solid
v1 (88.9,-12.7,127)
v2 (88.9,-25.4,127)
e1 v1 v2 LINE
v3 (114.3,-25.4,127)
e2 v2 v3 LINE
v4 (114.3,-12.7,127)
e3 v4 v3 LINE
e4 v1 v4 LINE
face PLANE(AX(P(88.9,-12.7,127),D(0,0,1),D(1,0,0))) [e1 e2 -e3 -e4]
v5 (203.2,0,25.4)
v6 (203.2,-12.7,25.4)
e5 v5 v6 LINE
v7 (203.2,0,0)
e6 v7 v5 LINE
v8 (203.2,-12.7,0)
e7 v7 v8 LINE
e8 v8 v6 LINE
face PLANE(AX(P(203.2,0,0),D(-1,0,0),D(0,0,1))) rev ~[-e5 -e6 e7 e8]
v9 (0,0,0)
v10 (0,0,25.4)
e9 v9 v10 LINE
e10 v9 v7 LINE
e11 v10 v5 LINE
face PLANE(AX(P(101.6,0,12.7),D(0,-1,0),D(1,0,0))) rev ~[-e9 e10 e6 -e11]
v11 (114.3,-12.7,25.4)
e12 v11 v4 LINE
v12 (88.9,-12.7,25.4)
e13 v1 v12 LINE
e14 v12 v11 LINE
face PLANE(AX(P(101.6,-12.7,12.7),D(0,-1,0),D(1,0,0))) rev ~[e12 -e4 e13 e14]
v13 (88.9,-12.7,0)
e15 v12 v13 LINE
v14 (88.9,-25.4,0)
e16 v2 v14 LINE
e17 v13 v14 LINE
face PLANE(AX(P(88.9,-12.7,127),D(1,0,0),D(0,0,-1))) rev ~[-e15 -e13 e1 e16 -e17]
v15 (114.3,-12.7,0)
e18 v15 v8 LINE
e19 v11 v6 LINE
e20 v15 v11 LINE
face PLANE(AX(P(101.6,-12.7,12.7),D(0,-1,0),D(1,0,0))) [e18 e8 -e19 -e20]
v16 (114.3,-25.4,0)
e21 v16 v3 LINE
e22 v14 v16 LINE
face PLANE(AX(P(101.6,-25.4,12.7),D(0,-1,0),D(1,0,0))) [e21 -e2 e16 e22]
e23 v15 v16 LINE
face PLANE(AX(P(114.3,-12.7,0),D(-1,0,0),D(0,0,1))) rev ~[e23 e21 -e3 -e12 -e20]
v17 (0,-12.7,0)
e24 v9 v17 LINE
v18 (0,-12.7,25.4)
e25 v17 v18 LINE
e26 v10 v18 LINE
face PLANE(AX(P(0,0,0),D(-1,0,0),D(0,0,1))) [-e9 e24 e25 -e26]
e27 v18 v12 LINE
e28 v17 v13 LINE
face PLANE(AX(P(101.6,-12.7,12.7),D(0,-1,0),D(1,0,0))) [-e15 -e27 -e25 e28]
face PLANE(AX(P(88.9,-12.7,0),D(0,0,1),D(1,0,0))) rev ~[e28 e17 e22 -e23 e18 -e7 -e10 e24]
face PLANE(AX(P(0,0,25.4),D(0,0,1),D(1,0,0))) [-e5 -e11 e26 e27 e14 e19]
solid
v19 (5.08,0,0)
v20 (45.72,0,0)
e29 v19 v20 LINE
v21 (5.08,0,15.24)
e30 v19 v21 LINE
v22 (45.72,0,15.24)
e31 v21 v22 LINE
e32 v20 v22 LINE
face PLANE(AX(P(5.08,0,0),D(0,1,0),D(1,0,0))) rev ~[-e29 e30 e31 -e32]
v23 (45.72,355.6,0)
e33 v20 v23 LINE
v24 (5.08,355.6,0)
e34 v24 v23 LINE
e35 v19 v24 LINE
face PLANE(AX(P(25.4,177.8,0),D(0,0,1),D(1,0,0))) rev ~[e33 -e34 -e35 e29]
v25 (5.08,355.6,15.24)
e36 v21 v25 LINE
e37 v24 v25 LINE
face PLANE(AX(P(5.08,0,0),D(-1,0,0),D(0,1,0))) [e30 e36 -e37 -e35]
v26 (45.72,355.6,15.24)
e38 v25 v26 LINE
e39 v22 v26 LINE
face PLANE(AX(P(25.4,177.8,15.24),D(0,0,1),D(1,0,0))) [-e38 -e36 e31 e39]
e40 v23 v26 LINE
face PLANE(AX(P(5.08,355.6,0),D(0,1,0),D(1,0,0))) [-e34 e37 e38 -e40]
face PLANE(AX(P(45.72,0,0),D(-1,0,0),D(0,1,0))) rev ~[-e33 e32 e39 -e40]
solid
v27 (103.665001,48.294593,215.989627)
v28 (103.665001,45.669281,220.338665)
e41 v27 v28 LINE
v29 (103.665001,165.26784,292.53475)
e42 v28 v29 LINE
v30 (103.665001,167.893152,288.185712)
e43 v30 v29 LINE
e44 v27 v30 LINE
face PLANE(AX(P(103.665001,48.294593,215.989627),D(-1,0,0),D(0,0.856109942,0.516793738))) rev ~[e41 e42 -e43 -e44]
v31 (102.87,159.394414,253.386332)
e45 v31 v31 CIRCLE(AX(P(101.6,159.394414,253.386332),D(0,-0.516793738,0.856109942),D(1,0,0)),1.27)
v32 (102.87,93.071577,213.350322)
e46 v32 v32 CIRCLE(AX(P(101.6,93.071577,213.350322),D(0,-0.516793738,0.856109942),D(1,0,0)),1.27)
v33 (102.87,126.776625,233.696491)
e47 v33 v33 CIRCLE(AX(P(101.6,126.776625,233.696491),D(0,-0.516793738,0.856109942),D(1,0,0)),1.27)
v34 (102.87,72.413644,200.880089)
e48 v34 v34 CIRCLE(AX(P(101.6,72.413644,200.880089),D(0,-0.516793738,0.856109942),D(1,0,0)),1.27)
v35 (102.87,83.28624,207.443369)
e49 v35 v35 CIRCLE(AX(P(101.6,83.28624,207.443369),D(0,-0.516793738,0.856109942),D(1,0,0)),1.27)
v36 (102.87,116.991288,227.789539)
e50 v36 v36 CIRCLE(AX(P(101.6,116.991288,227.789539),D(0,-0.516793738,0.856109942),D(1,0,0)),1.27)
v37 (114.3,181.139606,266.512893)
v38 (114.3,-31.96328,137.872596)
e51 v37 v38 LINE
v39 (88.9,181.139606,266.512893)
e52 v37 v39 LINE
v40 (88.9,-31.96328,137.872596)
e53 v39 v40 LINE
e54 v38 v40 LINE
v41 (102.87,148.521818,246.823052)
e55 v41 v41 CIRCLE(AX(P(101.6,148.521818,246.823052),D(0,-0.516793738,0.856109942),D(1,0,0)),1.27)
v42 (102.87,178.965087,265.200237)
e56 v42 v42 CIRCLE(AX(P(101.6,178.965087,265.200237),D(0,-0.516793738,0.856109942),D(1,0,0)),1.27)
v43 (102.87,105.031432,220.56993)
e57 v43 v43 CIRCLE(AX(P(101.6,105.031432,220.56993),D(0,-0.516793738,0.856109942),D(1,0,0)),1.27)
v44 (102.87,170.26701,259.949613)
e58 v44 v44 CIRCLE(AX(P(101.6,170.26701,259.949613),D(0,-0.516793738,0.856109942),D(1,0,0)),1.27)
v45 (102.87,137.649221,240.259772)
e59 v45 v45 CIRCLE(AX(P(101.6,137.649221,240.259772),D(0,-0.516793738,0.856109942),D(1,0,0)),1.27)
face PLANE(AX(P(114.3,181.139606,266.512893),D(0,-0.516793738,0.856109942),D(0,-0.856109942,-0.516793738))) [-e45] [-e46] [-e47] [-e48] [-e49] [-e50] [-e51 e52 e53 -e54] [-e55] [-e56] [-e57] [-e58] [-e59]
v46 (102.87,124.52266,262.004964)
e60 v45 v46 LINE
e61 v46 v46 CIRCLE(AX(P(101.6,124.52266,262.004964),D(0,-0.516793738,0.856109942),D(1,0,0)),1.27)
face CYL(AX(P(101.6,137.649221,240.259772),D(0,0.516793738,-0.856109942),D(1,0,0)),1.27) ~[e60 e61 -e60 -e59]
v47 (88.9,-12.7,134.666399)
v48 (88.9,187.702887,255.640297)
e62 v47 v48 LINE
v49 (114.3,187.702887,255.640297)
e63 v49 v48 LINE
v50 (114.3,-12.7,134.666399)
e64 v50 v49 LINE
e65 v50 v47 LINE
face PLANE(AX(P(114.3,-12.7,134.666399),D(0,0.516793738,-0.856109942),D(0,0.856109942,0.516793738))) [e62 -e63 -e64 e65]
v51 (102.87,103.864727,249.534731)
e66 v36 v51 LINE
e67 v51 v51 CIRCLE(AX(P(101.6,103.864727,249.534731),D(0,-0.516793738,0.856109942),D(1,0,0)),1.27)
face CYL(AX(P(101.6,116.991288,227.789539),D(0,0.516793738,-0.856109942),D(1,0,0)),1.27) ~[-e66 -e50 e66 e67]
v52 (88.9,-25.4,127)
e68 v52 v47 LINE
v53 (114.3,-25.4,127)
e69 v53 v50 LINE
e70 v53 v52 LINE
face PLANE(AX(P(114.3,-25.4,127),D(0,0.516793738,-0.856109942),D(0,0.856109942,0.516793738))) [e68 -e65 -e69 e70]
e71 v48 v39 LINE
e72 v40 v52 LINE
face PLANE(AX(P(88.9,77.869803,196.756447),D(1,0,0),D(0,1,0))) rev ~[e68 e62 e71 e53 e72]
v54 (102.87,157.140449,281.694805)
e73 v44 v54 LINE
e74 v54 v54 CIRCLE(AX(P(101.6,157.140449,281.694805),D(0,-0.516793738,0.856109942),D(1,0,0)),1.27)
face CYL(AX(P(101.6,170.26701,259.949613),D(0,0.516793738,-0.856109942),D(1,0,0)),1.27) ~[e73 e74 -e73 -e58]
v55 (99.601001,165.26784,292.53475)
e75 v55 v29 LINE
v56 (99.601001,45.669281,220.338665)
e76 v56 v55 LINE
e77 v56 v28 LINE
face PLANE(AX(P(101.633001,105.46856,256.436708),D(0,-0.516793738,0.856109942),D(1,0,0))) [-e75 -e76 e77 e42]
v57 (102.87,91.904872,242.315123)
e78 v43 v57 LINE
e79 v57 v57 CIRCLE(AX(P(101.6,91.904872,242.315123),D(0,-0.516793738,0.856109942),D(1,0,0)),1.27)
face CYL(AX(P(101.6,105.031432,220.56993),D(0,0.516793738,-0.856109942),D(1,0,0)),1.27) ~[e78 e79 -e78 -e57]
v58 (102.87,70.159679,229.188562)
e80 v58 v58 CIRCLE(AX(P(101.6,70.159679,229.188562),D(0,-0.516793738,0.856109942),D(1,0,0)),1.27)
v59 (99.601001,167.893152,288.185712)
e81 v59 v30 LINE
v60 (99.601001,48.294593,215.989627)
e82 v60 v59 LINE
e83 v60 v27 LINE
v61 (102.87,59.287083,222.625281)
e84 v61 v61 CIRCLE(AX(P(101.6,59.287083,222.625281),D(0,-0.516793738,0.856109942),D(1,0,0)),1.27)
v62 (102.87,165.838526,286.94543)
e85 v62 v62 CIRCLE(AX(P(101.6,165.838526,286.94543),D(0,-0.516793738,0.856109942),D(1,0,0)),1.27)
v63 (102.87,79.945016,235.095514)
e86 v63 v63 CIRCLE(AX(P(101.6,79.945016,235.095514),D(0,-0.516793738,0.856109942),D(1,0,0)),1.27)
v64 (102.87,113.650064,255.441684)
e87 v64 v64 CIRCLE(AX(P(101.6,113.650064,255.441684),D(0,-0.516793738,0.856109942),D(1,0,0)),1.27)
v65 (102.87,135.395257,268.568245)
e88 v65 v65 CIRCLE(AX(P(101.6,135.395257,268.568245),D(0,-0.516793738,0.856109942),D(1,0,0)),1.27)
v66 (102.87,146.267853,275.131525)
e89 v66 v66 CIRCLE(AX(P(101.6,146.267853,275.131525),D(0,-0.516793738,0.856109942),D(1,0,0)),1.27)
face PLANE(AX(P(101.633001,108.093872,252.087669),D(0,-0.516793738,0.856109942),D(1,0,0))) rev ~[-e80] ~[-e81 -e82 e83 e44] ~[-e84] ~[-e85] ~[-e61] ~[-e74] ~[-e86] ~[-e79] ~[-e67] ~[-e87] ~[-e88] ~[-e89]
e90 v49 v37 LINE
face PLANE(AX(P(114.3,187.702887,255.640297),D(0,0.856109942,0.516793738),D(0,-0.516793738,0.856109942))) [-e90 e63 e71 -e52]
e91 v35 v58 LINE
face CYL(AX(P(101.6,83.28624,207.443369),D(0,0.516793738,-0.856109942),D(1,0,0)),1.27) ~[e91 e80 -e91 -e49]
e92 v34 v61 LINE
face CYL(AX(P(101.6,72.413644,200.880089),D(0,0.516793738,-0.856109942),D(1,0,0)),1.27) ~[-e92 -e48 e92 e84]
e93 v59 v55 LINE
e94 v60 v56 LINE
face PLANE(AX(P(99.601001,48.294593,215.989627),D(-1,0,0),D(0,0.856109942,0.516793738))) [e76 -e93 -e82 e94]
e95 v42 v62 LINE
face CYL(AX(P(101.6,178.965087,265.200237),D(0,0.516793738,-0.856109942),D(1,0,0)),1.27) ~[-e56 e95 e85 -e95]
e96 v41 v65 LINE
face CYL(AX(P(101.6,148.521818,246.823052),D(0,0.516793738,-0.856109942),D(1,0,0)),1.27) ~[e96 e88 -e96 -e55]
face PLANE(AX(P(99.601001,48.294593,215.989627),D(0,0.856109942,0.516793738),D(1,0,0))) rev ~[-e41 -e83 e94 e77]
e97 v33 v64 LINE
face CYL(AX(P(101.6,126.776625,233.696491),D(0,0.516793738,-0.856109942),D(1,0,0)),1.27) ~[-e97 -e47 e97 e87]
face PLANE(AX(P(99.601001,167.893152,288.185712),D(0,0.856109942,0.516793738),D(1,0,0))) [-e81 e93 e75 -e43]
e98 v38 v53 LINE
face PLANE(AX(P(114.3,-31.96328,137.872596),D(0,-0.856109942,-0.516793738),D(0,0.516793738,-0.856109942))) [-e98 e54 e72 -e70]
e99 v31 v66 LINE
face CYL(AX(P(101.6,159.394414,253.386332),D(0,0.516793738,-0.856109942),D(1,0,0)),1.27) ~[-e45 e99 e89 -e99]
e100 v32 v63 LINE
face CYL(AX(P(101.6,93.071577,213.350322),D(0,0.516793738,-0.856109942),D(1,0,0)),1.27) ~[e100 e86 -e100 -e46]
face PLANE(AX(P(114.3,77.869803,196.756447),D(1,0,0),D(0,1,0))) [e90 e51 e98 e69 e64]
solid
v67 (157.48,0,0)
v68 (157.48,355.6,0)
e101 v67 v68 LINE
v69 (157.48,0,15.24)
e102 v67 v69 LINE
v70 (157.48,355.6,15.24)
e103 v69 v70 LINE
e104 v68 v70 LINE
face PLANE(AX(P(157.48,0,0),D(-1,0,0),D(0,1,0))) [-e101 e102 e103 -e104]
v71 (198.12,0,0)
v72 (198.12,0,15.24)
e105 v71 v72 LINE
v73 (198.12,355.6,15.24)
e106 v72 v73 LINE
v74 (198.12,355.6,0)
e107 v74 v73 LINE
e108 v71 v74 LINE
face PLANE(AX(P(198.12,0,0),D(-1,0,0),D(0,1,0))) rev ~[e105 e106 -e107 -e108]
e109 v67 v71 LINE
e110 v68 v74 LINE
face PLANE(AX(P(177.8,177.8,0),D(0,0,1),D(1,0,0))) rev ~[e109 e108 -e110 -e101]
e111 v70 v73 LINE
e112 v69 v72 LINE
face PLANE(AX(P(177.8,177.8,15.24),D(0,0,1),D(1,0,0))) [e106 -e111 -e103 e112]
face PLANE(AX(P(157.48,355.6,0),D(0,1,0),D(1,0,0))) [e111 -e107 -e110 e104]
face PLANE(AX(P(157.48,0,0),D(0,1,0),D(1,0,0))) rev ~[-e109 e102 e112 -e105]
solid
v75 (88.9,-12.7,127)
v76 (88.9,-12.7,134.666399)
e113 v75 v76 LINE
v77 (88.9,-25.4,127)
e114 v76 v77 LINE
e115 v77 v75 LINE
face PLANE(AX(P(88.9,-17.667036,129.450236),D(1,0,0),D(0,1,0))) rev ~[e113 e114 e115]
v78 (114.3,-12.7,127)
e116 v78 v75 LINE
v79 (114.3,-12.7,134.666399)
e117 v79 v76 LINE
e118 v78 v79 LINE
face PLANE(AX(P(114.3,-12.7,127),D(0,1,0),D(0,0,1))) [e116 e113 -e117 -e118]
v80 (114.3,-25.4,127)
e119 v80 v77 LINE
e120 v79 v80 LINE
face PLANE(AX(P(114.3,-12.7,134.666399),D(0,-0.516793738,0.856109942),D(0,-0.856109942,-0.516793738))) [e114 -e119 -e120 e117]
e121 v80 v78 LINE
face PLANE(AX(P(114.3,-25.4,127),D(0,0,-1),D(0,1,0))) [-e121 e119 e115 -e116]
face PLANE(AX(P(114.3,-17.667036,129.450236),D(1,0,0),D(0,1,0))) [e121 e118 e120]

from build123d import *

# Parameters (mm, degrees)
F0_W      = 40.64
F0_H      = 355.6
F2_DEPTH  = 15.24
F1_W      = 203.2
F1_H      = 25.4
F3_DEPTH  = 12.7
F4_W      = 25.4
F4_H      = 25.4
F4_H_2    = 101.6
F5_DEPTH  = 12.7
F7_DEPTH  = 25.4
F9_DEPTH  = 25.4
F10_R     = 1.27
F11_DEPTH = 25.4
F12_W     = 4.064
F12_H     = 139.7
F13_DEPTH = 5.08


with BuildPart() as f2:
    # F0 (on Top) → F2 (new body)
    with BuildSketch(Plane.XY):
        with Locations((177.8, 177.8)):
            Rectangle(F0_W, F0_H)
    extrude(amount=F2_DEPTH)


with BuildPart() as f2b:
    # F0 (on Top) → F2, piece 2 (new body)
    with BuildSketch(Plane.XY):
        with Locations((25.4, 177.8)):
            Rectangle(F0_W, F0_H)
    extrude(amount=F2_DEPTH)


with BuildPart() as f3:
    # F1 (on Front) → F3 (new body)
    with BuildSketch(Plane.XZ):
        with Locations((101.6, 12.7)):
            Rectangle(F1_W, F1_H)
    extrude(amount=F3_DEPTH)

    # F4 (on face) → F5 (join)
    with BuildSketch(Plane.XZ.offset(12.7)):
        with Locations((101.6, 12.7)):
            Rectangle(F4_W, F4_H)
        with Locations((101.6, 76.2)):
            Rectangle(F4_W, F4_H_2)
    extrude(amount=F5_DEPTH)


with BuildPart() as f7:
    # F6 (on face) → F7 (new body)
    with BuildSketch(Plane.YZ.offset(114.3)):
        Polygon((181.1396062945, 266.5128934246), (-31.9632804674, 137.8725962634), (-25.4, 127), (-12.7, 134.666399075), (187.7028867619, 255.6402971612), align=None)
    extrude(amount=-F7_DEPTH)

    # F10 (on face) → F11 (join)
    with BuildSketch(Plane(origin=(0, -69.5359015573, 115.1917531478), x_dir=(1, 0, 0), z_dir=(0, -0.5167937376, 0.856109942))):
        with Locations((101.6, 290.2676121474)):
            Circle(F10_R)
        with Locations((101.6, 267.4076121474)):
            Circle(F10_R)
        with Locations((101.6, 242.0076121474)):
            Circle(F10_R)
        with Locations((101.6, 217.8776121474)):
            Circle(F10_R)
        with Locations((101.6, 203.9076121474)):
            Circle(F10_R)
        with Locations((101.6, 189.9376121474)):
            Circle(F10_R)
        with Locations((101.6, 178.5076121474)):
            Circle(F10_R)
        with Locations((101.6, 165.8076121474)):
            Circle(F10_R)
        with Locations((101.6, 229.3076121474)):
            Circle(F10_R)
        with Locations((101.6, 254.7076121474)):
            Circle(F10_R)
        with Locations((101.6, 280.1076121474)):
            Circle(F10_R)
    extrude(amount=F11_DEPTH)

    # F12 (on face) → F13 (join)
    with BuildSketch(Plane(origin=(0, -82.6624624921, 136.9369456745), x_dir=(1, 0, 0), z_dir=(0, -0.5167937376, 0.856109942))):
        with Locations((101.6330005474, 222.8175677299)):
            Rectangle(F12_W, F12_H)
    extrude(amount=F13_DEPTH)


with BuildPart() as f9:
    # F8 (on face) → F9 (new body)
    with BuildSketch(Plane.YZ.offset(114.3)):
        Polygon((-25.4, 127), (-12.7, 127), (-12.7, 134.666399075), align=None)
    extrude(amount=-F9_DEPTH)


solid = Compound([f2.part, f2b.part, f3.part, f7.part, f9.part])
